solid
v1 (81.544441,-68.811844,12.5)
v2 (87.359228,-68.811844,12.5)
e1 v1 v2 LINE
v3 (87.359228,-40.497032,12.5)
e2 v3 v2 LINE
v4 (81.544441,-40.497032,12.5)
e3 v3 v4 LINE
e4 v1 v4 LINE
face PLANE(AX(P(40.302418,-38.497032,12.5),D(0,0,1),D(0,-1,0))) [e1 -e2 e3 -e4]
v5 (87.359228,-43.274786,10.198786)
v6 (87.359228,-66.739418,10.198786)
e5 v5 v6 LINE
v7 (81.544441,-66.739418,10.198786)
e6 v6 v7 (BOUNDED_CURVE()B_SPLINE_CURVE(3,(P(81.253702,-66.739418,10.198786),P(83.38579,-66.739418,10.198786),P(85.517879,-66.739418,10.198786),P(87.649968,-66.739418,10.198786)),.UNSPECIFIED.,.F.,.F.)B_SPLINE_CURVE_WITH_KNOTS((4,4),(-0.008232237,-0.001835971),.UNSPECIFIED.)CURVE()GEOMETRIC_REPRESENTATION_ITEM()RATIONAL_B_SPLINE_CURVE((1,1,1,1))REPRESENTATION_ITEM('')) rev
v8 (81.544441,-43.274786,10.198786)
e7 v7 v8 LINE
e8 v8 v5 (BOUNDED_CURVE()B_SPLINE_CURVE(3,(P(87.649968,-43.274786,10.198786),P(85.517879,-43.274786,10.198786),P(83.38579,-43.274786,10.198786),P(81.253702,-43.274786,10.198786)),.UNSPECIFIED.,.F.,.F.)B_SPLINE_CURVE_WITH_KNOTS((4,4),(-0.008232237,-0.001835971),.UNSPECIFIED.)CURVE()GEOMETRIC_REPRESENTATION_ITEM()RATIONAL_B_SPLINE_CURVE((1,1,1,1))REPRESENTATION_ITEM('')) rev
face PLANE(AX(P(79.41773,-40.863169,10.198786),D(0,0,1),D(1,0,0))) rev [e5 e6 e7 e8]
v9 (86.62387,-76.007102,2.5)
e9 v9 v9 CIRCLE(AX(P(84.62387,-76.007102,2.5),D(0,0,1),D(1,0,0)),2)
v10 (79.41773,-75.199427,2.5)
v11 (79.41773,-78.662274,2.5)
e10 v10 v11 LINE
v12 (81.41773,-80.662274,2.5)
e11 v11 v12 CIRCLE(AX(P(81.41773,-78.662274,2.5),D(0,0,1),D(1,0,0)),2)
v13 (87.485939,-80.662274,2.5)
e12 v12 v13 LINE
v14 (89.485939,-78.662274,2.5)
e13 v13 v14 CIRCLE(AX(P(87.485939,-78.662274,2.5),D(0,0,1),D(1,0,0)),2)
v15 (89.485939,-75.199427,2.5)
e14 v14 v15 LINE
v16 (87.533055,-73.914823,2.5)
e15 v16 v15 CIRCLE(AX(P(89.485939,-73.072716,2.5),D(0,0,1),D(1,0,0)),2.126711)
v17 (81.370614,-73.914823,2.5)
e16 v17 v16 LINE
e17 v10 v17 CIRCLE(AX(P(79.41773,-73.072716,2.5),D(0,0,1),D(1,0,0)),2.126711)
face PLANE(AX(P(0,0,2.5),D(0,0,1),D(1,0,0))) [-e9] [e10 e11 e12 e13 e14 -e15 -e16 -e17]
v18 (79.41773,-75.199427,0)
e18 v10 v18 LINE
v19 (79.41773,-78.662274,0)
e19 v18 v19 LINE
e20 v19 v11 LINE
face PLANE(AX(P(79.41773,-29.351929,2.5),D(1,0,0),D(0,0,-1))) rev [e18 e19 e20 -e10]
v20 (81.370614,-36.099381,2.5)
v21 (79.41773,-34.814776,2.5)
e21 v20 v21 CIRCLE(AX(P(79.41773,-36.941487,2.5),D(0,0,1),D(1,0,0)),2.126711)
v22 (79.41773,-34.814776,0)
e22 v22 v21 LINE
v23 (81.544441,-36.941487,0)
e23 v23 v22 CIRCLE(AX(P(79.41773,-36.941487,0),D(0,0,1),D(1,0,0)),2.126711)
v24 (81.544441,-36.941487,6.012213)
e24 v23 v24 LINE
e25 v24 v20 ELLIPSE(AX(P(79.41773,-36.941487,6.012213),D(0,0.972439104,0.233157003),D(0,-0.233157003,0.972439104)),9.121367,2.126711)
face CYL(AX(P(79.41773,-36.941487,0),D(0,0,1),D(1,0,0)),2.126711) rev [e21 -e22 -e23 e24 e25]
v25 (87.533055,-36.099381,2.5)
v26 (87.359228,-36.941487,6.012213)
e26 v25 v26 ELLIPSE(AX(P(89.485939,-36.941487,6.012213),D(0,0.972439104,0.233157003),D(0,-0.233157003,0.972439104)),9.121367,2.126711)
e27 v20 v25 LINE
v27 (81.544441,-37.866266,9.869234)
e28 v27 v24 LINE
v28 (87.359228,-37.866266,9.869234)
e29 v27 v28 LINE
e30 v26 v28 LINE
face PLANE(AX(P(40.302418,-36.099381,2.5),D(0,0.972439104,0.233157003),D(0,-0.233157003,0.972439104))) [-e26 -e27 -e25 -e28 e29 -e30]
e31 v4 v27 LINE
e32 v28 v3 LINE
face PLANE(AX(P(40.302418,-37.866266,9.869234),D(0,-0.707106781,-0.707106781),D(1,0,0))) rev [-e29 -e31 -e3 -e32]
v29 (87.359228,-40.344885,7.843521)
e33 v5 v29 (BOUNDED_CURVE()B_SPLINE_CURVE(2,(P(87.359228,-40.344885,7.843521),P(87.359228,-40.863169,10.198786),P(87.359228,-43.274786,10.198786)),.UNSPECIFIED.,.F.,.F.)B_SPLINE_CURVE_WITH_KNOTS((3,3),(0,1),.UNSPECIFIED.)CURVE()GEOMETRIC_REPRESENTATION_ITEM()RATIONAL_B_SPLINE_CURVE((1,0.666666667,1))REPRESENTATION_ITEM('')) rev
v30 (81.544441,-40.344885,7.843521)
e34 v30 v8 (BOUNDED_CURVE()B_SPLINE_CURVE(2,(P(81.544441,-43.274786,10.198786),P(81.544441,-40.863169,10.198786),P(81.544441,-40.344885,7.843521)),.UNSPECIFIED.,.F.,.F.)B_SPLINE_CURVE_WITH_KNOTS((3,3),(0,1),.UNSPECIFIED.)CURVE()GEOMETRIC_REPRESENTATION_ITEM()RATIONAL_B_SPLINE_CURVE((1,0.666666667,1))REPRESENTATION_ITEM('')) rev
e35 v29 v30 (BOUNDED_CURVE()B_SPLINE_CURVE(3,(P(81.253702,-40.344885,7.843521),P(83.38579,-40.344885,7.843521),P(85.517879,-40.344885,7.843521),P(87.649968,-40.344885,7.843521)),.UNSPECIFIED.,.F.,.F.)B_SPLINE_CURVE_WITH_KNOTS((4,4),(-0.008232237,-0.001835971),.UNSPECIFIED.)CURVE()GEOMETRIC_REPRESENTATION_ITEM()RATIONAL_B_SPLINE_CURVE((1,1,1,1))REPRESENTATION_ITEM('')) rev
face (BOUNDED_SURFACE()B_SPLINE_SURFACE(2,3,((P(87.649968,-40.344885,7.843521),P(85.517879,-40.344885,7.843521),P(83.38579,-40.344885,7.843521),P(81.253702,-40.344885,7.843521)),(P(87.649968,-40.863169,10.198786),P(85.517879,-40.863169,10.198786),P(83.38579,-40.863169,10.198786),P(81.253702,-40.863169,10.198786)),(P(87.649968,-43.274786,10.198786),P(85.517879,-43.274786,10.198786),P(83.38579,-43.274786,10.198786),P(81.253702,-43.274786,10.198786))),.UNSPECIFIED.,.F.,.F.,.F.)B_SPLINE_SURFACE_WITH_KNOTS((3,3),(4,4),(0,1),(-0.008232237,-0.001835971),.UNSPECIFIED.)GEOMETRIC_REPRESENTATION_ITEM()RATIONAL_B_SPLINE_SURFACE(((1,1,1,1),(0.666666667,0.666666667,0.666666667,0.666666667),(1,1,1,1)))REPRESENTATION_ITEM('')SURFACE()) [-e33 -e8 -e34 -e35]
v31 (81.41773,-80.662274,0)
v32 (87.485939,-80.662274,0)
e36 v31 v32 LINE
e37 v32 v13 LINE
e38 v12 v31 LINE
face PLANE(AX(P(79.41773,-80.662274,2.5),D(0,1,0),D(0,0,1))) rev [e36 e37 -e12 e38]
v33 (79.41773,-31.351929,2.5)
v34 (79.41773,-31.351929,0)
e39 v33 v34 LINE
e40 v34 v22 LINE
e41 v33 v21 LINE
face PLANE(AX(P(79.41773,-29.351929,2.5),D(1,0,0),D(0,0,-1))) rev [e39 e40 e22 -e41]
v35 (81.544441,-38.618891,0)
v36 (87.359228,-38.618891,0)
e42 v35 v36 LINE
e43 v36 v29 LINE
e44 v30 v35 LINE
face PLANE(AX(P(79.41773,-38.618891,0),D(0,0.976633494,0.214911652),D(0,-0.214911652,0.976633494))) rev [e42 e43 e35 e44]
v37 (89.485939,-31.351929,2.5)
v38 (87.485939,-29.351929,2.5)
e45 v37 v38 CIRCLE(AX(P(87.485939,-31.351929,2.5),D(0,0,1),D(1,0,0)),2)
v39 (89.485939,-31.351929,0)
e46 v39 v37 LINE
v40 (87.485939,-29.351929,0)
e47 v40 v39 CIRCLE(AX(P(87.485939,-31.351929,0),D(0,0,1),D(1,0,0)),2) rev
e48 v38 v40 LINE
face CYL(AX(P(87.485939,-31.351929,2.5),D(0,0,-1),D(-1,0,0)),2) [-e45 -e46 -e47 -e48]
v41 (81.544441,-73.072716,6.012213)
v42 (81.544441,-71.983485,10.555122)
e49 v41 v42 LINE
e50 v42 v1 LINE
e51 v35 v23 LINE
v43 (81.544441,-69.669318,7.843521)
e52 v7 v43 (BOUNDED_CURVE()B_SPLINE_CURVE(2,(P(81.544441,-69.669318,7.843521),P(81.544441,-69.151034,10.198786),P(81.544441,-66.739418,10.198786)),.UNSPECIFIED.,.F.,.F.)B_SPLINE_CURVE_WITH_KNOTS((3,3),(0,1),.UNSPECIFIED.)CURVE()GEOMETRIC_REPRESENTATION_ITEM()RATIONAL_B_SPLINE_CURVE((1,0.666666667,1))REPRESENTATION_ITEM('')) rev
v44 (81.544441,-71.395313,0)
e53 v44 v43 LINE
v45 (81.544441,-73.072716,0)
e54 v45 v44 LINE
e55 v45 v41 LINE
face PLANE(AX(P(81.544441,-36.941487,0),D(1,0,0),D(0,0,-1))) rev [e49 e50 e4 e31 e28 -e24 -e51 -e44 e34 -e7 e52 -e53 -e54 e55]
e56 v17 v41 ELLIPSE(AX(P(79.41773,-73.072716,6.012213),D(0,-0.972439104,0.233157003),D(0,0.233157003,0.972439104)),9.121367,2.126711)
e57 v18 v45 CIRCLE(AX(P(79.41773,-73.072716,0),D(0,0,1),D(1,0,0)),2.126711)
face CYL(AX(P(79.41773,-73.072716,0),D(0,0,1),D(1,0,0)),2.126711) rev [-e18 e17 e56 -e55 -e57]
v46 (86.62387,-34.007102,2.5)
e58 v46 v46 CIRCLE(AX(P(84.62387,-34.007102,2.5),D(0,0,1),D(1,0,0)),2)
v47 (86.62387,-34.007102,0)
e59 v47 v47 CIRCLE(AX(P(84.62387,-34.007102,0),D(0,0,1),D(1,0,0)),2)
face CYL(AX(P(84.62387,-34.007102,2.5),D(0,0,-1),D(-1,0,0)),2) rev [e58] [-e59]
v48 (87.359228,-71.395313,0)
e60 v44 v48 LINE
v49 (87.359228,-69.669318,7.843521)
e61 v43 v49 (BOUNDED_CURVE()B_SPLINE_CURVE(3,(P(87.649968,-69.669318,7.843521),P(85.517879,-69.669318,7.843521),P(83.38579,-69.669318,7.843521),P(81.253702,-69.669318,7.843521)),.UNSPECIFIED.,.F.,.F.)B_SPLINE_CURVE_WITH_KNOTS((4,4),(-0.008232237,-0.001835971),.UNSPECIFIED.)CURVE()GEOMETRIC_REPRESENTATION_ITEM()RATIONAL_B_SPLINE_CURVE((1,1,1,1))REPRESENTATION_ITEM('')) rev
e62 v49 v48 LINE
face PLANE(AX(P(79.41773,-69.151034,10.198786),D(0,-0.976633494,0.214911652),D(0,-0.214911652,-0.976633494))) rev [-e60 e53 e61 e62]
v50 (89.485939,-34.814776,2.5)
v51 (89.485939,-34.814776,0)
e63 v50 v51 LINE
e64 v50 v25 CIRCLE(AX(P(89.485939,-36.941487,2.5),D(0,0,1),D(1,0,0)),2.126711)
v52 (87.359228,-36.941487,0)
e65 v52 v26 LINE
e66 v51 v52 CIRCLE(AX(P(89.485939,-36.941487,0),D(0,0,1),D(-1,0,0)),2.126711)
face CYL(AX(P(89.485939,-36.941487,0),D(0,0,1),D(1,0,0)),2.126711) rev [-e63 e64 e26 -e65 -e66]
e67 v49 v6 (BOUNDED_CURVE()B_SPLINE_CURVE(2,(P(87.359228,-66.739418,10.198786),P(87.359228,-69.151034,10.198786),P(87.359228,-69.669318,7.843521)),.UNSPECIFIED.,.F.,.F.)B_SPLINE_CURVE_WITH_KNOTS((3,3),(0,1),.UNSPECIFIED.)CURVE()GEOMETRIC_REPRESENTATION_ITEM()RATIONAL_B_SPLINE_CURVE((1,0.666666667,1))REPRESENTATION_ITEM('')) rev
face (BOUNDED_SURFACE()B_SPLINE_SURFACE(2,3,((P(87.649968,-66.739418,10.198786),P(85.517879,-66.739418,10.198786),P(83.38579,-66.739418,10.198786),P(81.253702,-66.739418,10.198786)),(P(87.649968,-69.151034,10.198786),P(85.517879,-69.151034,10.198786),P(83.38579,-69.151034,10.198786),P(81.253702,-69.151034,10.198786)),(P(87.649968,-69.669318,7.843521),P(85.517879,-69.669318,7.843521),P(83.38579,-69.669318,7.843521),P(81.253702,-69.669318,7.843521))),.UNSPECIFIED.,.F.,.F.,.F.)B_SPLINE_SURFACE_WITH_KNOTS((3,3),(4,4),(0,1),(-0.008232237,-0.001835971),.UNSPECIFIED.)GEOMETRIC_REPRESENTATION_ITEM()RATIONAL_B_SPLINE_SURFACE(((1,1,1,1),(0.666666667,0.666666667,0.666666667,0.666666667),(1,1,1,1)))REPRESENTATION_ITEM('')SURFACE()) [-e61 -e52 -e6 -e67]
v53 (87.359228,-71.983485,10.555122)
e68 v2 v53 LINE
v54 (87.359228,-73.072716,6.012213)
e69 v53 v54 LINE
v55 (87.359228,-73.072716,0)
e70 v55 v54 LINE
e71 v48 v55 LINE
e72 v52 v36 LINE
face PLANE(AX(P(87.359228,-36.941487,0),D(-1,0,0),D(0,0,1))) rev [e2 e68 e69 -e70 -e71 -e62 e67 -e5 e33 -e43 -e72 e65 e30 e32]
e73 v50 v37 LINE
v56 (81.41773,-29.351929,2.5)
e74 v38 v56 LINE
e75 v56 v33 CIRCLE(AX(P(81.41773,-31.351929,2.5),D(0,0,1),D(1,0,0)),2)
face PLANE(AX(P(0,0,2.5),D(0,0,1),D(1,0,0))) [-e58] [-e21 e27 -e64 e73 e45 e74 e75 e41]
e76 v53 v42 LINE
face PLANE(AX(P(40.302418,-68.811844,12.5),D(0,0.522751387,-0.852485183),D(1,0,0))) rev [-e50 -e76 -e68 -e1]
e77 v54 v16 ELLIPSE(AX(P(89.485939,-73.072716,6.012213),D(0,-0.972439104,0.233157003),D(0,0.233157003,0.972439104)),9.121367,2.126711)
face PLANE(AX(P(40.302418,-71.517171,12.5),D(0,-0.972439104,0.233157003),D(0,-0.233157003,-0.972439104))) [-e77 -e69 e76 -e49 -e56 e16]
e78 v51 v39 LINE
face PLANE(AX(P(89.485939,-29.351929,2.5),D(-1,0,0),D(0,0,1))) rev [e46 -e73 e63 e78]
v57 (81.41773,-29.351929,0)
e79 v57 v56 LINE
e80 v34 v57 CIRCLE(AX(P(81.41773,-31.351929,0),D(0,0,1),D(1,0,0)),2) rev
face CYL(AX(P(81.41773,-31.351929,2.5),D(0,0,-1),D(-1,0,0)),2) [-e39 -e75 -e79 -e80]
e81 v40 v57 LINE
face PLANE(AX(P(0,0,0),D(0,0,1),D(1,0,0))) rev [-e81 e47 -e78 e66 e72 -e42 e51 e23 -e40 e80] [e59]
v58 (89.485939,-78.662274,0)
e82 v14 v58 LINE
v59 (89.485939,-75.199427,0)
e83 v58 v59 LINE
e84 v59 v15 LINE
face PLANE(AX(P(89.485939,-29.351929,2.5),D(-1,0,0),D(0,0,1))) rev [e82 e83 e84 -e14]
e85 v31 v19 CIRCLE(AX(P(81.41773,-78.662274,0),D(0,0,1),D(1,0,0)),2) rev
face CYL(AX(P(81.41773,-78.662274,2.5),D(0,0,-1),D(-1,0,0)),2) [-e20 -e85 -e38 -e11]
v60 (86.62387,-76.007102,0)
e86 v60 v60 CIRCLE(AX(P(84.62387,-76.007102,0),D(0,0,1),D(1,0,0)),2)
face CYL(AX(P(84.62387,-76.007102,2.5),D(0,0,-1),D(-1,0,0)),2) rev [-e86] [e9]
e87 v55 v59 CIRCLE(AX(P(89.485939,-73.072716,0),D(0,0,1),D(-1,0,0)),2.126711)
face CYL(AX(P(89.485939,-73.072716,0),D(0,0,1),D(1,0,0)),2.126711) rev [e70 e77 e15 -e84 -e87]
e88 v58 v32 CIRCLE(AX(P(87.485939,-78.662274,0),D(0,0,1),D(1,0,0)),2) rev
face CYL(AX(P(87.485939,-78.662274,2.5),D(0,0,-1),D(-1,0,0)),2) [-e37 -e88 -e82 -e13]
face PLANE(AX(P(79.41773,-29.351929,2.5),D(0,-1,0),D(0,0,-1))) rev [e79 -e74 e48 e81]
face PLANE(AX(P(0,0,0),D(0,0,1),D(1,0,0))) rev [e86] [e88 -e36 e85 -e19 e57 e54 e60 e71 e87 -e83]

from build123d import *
from OCP.BRepFilletAPI import BRepFilletAPI_MakeChamfer

# Parameters (mm, degrees)
SKETCH_1_W               = 10.068208361
SKETCH_1_H               = 51.310344827
SKETCH_1_R               = 2
EXTRUDE_1_DEPTH          = 2.5
EXTRUDE_2_DEPTH          = 10.068208362
CUT_EXTRUDE_1_DEPTH      = 83.243670079
CUT_EXTRUDE_1_DEPTH_BACK = 83.243670079
CUT_EXTRUDE_2_DEPTH      = 122.121367623
CUT_EXTRUDE_2_DEPTH_BACK = 122.121367623
FILLET_2_R               = 2
CHAMFER_2_SIZE           = 2
CHAMFER_2_SIZE2          = 2.70532723


with BuildPart() as part:
    # 草图1 → 凸台-拉伸1 (new body)
    with BuildSketch(Plane.XY):
        with Locations((84.451834639, -55.007101597)):
            Rectangle(SKETCH_1_W, SKETCH_1_H)
        with Locations((84.623869854, -34.007101596)):
            Circle(SKETCH_1_R, mode=Mode.SUBTRACT)
        with Locations((84.623869854, -76.007101596)):
            Circle(SKETCH_1_R, mode=Mode.SUBTRACT)
    extrude(amount=EXTRUDE_1_DEPTH)

    # 草图2 → 凸台-拉伸2 (add)
    with BuildSketch(Plane(origin=(89.485938819, 0, 0), x_dir=(0, 0, -1), z_dir=(1, 0, 0))):
        Polygon((-12.5, -71.517171054), (-2.5, -73.914822505), (-2.5, -36.099380688), (-12.5, -38.497032139), align=None)
    extrude(amount=-EXTRUDE_2_DEPTH)

    # 草图3 → 切除-拉伸1 (cut, two sides: drawn at the far end of the back side and taken through both)
    with BuildSketch(Plane(origin=(89.485938819, 0, 0), x_dir=(0, 0, -1), z_dir=(1, 0, 0)).offset(-CUT_EXTRUDE_1_DEPTH_BACK)):
        Polygon((-10.198786391, -69.151033694), (0, -71.395312685), (0, -38.618890508), (-10.198786391, -40.863169498), align=None)
    extrude(amount=CUT_EXTRUDE_1_DEPTH + CUT_EXTRUDE_1_DEPTH_BACK, mode=Mode.SUBTRACT)

    # 草图4 → 切除-拉伸2 (cut, two sides: drawn at the far end of the back side and taken through both)
    with BuildSketch(Plane.XY.offset(12.5).offset(-CUT_EXTRUDE_2_DEPTH_BACK)):
        with BuildLine():
            Line((81.544440974, -36.941486908), (81.544440974, -73.072716285))
            ThreePointArc((81.544440974, -73.072716285), (79.417730458, -75.199426802), (77.291019941, -73.072716285))
            Line((77.291019941, -73.072716285), (77.291019941, -36.941486908))
            ThreePointArc((77.291019941, -36.941486908), (79.417730458, -34.814776391), (81.544440974, -36.941486908))
        make_face()
        with BuildLine():
            Line((87.359228302, -36.941486908), (87.359228302, -73.072716285))
            ThreePointArc((87.359228302, -73.072716285), (89.485938819, -75.199426802), (91.612649336, -73.072716285))
            Line((91.612649336, -73.072716285), (91.612649336, -36.941486908))
            ThreePointArc((91.612649336, -36.941486908), (89.485938819, -34.814776391), (87.359228302, -36.941486908))
        make_face()
    extrude(amount=CUT_EXTRUDE_2_DEPTH + CUT_EXTRUDE_2_DEPTH_BACK, mode=Mode.SUBTRACT)

    # 圆角1
    # a fillet whose section is not a circle: 3 mm, written as the material it adds along each edge
    with BuildSketch(Plane(origin=(87.359228302, -40.863169498, 10.198786391), x_dir=(0, 0.2149116520268582, -0.9766334941128564), z_dir=(-1, 0, 0)), Plane(origin=(87.359228302, -69.151033694, 10.198786391), x_dir=(0, 1, 0), z_dir=(-1, 0, 0))) as fillet_1_piece_1:
        with BuildLine():
            Bezier((2.411616085, 0), (0, 0), (-0.518284397, 2.355265044), weights=[1, 0.666666667, 1])
            Line((-0.518284397, 2.355265044), (0, 0))
            Line((0, 0), (2.411616085, 0))
        make_face()
    extrude(amount=5.814787328)

    # 圆角2
    fillet_2_edges = [part.edges().sort_by_distance(p)[0] for p in [
        (89.485938819, -80.66227401, 1.25),
        (79.417730458, -80.66227401, 1.25),
        (79.417730458, -29.351929183, 1.25),
        (89.485938819, -29.351929183, 1.25),
    ]]
    fillet(fillet_2_edges, radius=FILLET_2_R)

    # 倒角2: one chamfer whose edges measure the first distance from different faces: ONE call of the kernel's chamfer builder (chamfer() names one face for all edges)
    chamfer_2_edges_1 = [part.edges().sort_by_distance(p)[0] for p in [
        (84.451834638, -71.517171054, 12.5),
    ]]
    chamfer_2_side_1 = [part.faces().sort_by_distance(p)[0] for p in [
        (84.451834638, -72.722762821, 7.471780545),
    ]]
    chamfer_2_edges_2 = [part.edges().sort_by_distance(p)[0] for p in [
        (84.451834638, -38.497032139, 12.5),
    ]]
    chamfer_2_side_2 = [part.faces().sort_by_distance(p)[0] for p in [
        (84.451834638, -55.007101596, 12.5),
    ]]
    chamfer_2 = BRepFilletAPI_MakeChamfer(part.part.solid().wrapped)
    for e in chamfer_2_edges_1:
        chamfer_2.Add(CHAMFER_2_SIZE, CHAMFER_2_SIZE2, e.wrapped, chamfer_2_side_1[0].wrapped)  # the first distance lies on this face
    for e in chamfer_2_edges_2:
        chamfer_2.Add(CHAMFER_2_SIZE, CHAMFER_2_SIZE2, e.wrapped, chamfer_2_side_2[0].wrapped)  # the first distance lies on this face
    add(Compound.cast(chamfer_2.Shape()), mode=Mode.REPLACE)


solid = part.part
